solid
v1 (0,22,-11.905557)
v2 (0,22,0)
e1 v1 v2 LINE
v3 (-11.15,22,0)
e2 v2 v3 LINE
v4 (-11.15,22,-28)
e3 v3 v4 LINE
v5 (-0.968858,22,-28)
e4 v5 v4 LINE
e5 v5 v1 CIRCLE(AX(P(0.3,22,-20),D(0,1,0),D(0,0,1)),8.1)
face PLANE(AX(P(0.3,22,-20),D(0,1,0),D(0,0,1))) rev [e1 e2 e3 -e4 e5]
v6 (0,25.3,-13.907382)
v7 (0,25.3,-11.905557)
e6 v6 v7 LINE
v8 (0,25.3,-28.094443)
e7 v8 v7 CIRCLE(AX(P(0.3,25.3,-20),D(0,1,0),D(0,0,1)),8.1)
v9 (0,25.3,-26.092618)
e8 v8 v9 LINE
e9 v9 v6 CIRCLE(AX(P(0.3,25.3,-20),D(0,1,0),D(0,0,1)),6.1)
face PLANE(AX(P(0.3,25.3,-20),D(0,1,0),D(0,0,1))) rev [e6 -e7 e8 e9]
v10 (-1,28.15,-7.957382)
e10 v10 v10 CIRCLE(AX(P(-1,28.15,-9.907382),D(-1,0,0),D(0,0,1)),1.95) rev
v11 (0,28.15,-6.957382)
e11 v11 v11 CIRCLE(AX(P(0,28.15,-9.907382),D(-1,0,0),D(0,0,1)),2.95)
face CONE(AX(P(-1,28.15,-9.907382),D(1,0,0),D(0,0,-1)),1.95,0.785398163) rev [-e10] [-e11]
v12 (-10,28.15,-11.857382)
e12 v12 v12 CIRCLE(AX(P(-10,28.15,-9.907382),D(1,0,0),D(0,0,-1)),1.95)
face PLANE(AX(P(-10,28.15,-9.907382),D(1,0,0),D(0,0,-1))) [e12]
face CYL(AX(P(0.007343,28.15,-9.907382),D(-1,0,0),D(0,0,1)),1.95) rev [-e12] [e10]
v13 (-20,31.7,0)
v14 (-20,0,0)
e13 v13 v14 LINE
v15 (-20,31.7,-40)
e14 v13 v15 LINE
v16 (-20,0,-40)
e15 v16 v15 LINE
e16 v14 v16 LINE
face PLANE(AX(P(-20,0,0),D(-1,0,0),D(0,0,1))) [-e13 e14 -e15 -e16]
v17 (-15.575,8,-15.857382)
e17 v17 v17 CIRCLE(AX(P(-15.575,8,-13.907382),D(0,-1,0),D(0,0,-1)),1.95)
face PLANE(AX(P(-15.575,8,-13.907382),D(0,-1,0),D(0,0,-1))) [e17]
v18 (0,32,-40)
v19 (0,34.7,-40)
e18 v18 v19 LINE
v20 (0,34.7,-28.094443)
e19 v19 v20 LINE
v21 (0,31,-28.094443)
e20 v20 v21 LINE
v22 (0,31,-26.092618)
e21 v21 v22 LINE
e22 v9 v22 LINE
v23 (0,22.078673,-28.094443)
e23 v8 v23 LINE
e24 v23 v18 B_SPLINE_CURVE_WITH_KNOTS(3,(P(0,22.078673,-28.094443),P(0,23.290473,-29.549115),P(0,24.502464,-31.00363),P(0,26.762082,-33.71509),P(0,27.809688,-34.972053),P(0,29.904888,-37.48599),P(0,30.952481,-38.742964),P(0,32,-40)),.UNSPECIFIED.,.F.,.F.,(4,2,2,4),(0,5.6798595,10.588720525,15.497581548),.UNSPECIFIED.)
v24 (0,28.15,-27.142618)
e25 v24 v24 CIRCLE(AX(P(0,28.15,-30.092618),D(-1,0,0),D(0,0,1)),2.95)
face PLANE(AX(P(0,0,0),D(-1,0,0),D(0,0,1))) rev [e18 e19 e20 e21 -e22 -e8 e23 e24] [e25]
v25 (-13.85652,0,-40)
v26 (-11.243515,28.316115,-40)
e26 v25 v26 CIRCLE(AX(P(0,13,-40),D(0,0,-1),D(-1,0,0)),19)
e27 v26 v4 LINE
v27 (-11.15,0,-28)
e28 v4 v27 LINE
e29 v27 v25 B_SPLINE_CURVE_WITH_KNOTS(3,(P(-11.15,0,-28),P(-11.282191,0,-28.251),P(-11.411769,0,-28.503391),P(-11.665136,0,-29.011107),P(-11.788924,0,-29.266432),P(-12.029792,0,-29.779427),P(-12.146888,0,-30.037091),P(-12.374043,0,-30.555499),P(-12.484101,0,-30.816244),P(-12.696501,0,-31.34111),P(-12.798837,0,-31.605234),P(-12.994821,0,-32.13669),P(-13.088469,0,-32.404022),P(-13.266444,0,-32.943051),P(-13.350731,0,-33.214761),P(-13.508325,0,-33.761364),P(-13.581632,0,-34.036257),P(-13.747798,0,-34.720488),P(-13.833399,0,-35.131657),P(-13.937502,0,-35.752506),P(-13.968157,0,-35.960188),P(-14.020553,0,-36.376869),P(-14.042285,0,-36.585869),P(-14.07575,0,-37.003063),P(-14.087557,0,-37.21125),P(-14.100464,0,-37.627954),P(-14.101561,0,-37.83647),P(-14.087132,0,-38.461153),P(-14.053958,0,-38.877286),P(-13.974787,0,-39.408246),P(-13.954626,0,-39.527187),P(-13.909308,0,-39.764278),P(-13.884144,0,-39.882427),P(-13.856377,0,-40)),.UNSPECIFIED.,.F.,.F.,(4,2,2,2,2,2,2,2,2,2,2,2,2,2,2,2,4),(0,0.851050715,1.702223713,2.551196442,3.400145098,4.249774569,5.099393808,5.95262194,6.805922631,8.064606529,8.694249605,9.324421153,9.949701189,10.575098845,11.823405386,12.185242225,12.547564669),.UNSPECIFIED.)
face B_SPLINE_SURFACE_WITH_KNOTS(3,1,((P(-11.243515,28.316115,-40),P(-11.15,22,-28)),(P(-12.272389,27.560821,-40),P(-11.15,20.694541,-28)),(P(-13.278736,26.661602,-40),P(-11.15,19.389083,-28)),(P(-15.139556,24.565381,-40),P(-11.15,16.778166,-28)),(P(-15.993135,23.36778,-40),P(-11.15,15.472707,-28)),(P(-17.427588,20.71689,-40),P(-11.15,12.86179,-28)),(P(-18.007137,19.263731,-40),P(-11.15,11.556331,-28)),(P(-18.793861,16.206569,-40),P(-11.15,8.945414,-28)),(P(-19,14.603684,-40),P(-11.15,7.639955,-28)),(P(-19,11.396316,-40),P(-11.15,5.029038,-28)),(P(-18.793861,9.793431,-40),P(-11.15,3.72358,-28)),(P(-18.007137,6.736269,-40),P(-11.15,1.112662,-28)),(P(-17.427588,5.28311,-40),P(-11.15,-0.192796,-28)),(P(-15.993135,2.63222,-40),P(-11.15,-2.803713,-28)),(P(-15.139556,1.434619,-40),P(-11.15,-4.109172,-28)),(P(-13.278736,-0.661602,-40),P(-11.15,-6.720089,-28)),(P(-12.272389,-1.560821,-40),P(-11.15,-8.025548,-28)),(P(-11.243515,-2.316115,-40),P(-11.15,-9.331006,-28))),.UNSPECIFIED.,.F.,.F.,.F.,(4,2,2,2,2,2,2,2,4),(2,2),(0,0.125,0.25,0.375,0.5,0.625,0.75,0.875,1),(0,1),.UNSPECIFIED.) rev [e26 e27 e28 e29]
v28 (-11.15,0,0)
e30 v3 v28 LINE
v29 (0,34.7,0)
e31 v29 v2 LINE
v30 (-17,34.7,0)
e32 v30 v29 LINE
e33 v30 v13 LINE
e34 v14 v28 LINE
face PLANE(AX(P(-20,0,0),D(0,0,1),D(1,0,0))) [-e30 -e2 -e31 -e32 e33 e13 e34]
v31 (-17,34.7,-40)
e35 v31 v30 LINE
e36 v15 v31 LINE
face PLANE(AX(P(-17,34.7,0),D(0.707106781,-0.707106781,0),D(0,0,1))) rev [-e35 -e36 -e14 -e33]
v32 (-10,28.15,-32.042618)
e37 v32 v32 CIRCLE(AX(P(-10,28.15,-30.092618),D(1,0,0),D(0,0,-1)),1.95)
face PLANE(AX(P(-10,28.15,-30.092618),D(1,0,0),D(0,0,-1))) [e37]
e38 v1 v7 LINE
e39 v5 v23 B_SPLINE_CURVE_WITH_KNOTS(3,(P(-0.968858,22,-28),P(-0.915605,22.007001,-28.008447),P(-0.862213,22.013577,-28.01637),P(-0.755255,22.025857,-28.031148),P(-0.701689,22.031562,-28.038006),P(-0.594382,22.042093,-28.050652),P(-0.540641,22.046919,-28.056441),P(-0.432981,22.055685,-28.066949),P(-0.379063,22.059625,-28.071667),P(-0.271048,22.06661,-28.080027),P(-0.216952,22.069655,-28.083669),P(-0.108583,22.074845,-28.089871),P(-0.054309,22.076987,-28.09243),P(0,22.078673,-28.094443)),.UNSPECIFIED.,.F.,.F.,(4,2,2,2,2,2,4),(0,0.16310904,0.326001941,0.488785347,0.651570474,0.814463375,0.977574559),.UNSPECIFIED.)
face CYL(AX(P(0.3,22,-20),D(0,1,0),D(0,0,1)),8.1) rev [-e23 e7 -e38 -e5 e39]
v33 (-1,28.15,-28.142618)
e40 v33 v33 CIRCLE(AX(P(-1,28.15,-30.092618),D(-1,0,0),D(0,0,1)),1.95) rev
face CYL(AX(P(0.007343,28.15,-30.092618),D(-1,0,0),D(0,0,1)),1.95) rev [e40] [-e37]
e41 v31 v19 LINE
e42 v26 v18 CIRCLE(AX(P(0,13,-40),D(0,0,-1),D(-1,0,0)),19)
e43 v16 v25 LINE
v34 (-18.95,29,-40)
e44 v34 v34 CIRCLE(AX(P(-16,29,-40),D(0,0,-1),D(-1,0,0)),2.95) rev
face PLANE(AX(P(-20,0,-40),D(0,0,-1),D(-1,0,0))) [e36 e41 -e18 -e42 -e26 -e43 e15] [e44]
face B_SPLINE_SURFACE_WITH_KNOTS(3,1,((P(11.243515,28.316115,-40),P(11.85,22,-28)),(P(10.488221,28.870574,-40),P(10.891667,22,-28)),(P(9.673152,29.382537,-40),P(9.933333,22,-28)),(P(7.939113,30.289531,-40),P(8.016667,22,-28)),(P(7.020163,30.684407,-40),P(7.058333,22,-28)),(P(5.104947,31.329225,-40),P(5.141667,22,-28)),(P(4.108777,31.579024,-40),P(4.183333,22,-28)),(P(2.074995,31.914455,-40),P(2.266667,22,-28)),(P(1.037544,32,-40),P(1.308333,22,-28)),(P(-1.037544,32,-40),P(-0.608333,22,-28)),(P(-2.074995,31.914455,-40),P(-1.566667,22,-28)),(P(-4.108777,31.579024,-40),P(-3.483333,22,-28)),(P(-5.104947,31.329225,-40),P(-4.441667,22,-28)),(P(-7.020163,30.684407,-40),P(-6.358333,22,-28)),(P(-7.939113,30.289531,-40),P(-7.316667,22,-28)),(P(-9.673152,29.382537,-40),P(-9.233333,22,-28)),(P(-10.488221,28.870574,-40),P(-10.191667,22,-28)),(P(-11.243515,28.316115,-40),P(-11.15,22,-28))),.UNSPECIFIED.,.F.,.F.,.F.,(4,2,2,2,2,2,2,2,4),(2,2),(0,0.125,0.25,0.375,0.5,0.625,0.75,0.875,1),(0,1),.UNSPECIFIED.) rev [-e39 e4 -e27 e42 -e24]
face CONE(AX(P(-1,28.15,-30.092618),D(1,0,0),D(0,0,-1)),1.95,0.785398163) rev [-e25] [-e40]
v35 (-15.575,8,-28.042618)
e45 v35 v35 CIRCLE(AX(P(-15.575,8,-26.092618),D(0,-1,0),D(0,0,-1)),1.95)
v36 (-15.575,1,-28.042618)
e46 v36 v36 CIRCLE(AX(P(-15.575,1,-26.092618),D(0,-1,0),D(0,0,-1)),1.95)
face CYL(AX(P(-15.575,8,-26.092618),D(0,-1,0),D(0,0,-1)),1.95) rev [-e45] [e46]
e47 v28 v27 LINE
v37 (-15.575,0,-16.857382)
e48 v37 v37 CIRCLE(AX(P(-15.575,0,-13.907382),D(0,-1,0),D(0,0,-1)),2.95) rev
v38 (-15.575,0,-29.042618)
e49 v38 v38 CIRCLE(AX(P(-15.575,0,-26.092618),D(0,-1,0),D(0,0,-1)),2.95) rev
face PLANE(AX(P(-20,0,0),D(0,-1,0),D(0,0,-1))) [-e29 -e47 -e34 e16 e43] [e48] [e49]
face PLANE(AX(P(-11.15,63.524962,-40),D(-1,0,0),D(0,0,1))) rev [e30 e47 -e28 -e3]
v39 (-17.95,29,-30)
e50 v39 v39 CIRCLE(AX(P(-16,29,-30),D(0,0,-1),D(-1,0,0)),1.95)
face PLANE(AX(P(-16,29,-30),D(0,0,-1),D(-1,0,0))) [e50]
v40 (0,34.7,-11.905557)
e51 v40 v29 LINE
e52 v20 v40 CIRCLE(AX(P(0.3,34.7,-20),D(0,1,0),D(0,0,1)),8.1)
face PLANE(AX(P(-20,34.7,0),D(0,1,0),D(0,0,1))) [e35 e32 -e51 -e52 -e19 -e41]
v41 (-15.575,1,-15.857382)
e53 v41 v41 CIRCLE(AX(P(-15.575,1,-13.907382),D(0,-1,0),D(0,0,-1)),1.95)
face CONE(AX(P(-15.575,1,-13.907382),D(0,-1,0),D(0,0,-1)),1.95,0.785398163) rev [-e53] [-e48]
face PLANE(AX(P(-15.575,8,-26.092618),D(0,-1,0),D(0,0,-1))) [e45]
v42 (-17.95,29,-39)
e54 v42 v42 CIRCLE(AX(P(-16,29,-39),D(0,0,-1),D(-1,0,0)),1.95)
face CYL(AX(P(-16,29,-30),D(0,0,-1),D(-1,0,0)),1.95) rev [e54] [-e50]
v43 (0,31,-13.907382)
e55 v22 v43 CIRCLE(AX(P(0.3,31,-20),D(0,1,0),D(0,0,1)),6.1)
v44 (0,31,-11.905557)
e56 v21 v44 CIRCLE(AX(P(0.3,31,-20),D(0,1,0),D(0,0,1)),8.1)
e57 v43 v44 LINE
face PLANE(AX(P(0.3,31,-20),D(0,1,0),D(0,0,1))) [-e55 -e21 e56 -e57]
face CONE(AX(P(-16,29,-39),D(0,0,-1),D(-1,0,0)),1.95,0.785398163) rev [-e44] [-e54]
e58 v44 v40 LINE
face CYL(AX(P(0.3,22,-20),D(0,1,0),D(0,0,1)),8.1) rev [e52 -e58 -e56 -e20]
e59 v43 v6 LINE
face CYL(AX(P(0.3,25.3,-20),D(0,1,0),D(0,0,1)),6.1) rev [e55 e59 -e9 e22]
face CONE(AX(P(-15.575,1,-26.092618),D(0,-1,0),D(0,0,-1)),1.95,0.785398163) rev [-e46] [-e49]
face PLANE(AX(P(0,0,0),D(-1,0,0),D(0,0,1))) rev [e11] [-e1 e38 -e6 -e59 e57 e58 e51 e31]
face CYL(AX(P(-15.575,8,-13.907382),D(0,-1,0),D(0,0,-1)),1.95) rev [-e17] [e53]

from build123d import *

# Parameters (mm, degrees)
SKETCH1_W               = 40
SKETCH1_H               = 34.7
BOSS_EXTRUDE1_DEPTH     = 20
SKETCH2_R               = 8.1
CUT_EXTRUDE1_DEPTH      = 12.7
SKETCH5_W               = 11.15
SKETCH5_H               = 40
CUT_EXTRUDE5_DEPTH      = 22
SKETCH9_R               = 8.1
SKETCH9_R_2             = 6.1
BOSS_EXTRUDE2_DEPTH     = 5.7
CUT_EXTRUDE6_DEPTH      = 57.604681952
CUT_EXTRUDE6_DEPTH_BACK = 57.604681952
SKETCH10_W              = 12
SKETCH10_H              = 40
SKETCH11_R              = 1.95
CUT_EXTRUDE7_DEPTH      = 8
CHAMFER1_SIZE           = 1
SKETCH12_R              = 1.95
CUT_EXTRUDE8_DEPTH      = 54.889609545
CHAMFER2_SIZE           = 1
SKETCH15_R              = 1.95
CUT_EXTRUDE11_DEPTH     = 10
CHAMFER3_SIZE           = 1
CHAMFER7_SIZE           = 3


with BuildPart() as part:
    # Sketch1 → Boss-Extrude1 (new body)
    with BuildSketch(Plane(origin=(0, 0, 0), x_dir=(0, 0, -1), z_dir=(1, 0, 0))):
        with Locations((20, 17.35)):
            Rectangle(SKETCH1_W, SKETCH1_H)
    extrude(amount=-BOSS_EXTRUDE1_DEPTH)

    # Sketch2 → Cut-Extrude1 (cut)
    with BuildSketch(Plane(origin=(0, 34.7, 0), x_dir=(1, 0, 0), z_dir=(0, 1, 0))):
        with Locations((0.3, 20)):
            Circle(SKETCH2_R)
    extrude(amount=-CUT_EXTRUDE1_DEPTH, mode=Mode.SUBTRACT)

    # Sketch5 → Cut-Extrude5 (cut)
    with BuildSketch(Plane.XZ):
        with Locations((-5.575, -20)):
            Rectangle(SKETCH5_W, SKETCH5_H)
    extrude(amount=-CUT_EXTRUDE5_DEPTH, mode=Mode.SUBTRACT)

    # Cut-Loft1: read off the stored shape, not the designer's step
    # Cut-Loft1: loft between two sections, ruled curve by curve
    cut_loft1_from = [
        Edge.make_bspline([(11.243514961, 28.316114759, -40), (10.488221253, 28.870573657, -40), (9.673151561, 29.382537078, -40), (7.939112522, 30.28953078, -40), (7.020163395, 30.684407436, -40), (5.104947281, 31.329224581, -40), (4.108776624, 31.579024462, -40), (2.074994957, 31.914454558, -40), (1.037543565, 32, -40), (-1.037543565, 32, -40), (-2.074994957, 31.914454558, -40), (-4.108776624, 31.579024462, -40), (-5.104947281, 31.329224581, -40), (-7.020163395, 30.684407436, -40), (-7.939112522, 30.28953078, -40), (-9.673151561, 29.382537078, -40), (-10.488221253, 28.870573657, -40), (-11.243514961, 28.316114759, -40)], [0, 0, 0, 0, 0.125, 0.125, 0.25, 0.25, 0.375, 0.375, 0.5, 0.5, 0.625, 0.625, 0.75, 0.75, 0.875, 0.875, 1, 1, 1, 1], 3),
        Edge.make_bspline([(-11.243514961, 28.316114759, -40), (-12.272389396, 27.560821051, -40), (-13.278735727, 26.661602289, -40), (-15.139556406, 24.56538073, -40), (-15.993134823, 23.367779698, -40), (-17.42758787, 20.71689046, -40), (-18.007136515, 19.263731202, -40), (-18.79386095, 16.206568982, -40), (-19, 14.603683637, -40), (-19, 11.396316363, -40), (-18.79386095, 9.793431018, -40), (-18.007136515, 6.736268798, -40), (-17.42758787, 5.28310954, -40), (-15.993134823, 2.632220302, -40), (-15.139556406, 1.43461927, -40), (-13.278735727, -0.661602289, -40), (-12.272389396, -1.560821051, -40), (-11.243514961, -2.316114759, -40)], [0, 0, 0, 0, 0.125, 0.125, 0.25, 0.25, 0.375, 0.375, 0.5, 0.5, 0.625, 0.625, 0.75, 0.75, 0.875, 0.875, 1, 1, 1, 1], 3),
        Edge.make_line((-11.243514961, -2.316114759, -40), (11.243514961, 28.316114759, -40)),
    ]
    cut_loft1_to = [
        Edge.make_bspline([(11.85, 22, -28), (10.891666667, 22, -28), (9.933333333, 22, -28), (8.016666667, 22, -28), (7.058333333, 22, -28), (5.141666667, 22, -28), (4.183333333, 22, -28), (2.266666667, 22, -28), (1.308333333, 22, -28), (-0.608333333, 22, -28), (-1.566666667, 22, -28), (-3.483333333, 22, -28), (-4.441666667, 22, -28), (-6.358333333, 22, -28), (-7.316666667, 22, -28), (-9.233333333, 22, -28), (-10.191666667, 22, -28), (-11.15, 22, -28)], [0, 0, 0, 0, 0.125, 0.125, 0.25, 0.25, 0.375, 0.375, 0.5, 0.5, 0.625, 0.625, 0.75, 0.75, 0.875, 0.875, 1, 1, 1, 1], 3),
        Edge.make_bspline([(-11.15, 22, -28), (-11.15, 20.694541399, -28), (-11.15, 19.389082798, -28), (-11.15, 16.778165596, -28), (-11.15, 15.472706995, -28), (-11.15, 12.861789793, -28), (-11.15, 11.556331192, -28), (-11.15, 8.94541399, -28), (-11.15, 7.639955389, -28), (-11.15, 5.029038187, -28), (-11.15, 3.723579586, -28), (-11.15, 1.112662384, -28), (-11.15, -0.192796217, -28), (-11.15, -2.803713419, -28), (-11.15, -4.10917202, -28), (-11.15, -6.720089222, -28), (-11.15, -8.025547823, -28), (-11.15, -9.331006424, -28)], [0, 0, 0, 0, 0.125, 0.125, 0.25, 0.25, 0.375, 0.375, 0.5, 0.5, 0.625, 0.625, 0.75, 0.75, 0.875, 0.875, 1, 1, 1, 1], 3),
        Edge.make_line((-11.15, -9.331006424, -28), (11.85, 22, -28)),
    ]
    cut_loft1 = Solid(Shell([*[Face.make_surface_from_curves(cut_loft1_from[k], cut_loft1_to[k]) for k in range(3)], Face(Wire(cut_loft1_from)), Face(Wire(cut_loft1_to))]))
    add(cut_loft1, mode=Mode.SUBTRACT)

    # Sketch9 → Boss-Extrude2 (add)
    with BuildSketch(Plane(origin=(0, 31, 0), x_dir=(1, 0, 0), z_dir=(0, 1, 0))):
        with Locations((0.3, 20)):
            Circle(SKETCH9_R)
        with Locations(Location((0.3, 20, 0), (0, 0, 270))):
            Circle(SKETCH9_R_2, mode=Mode.SUBTRACT)
    extrude(amount=-BOSS_EXTRUDE2_DEPTH)

    # Sketch10 → Cut-Extrude6 (cut, two sides: drawn at the far end of the back side and taken through both)
    with BuildSketch(Plane(origin=(0, 0, 0), x_dir=(1, 0, 0), z_dir=(0, 1, 0)).offset(-CUT_EXTRUDE6_DEPTH_BACK)):
        with Locations((6, 20)):
            Rectangle(SKETCH10_W, SKETCH10_H)
    extrude(amount=CUT_EXTRUDE6_DEPTH + CUT_EXTRUDE6_DEPTH_BACK, mode=Mode.SUBTRACT)

    # Sketch11 → Cut-Extrude7 (cut)
    with BuildSketch(Plane.XZ):
        with Locations(Location((-15.575, -13.907381515, 0), (0, 0, 270))):
            Circle(SKETCH11_R)
        with Locations(Location((-15.575, -26.092618485, 0), (0, 0, 270))):
            Circle(SKETCH11_R)
    extrude(amount=-CUT_EXTRUDE7_DEPTH, mode=Mode.SUBTRACT)

    # Chamfer1
    chamfer1_edges = [part.edges().sort_by_distance(p)[0] for p in [
        (-15.575, 0, -11.957381515),
        (-15.575, 0, -24.142618485),
    ]]
    chamfer(chamfer1_edges, length=CHAMFER1_SIZE)

    # Sketch12 → Cut-Extrude8 (cut, through all)
    with BuildSketch(Plane(origin=(-10, 0, 0), x_dir=(0, 0, -1), z_dir=(1, 0, 0))):
        with Locations(Location((9.907381515, 28.15, 0), (0, 0, 180))):
            Circle(SKETCH12_R)
        with Locations(Location((30.092618485, 28.15, 0), (0, 0, 180))):
            Circle(SKETCH12_R)
    extrude(amount=CUT_EXTRUDE8_DEPTH, mode=Mode.SUBTRACT)

    # Chamfer2
    chamfer2_edges = [part.edges().sort_by_distance(p)[0] for p in [
        (0, 28.15, -11.857381515),
        (0, 28.15, -32.042618485),
    ]]
    chamfer(chamfer2_edges, length=CHAMFER2_SIZE)

    # Sketch15 → Cut-Extrude11 (cut)
    with BuildSketch(Plane(origin=(0, 0, -40), x_dir=(-1, 0, 0), z_dir=(0, 0, -1))):
        with Locations((16, 29)):
            Circle(SKETCH15_R)
    extrude(amount=-CUT_EXTRUDE11_DEPTH, mode=Mode.SUBTRACT)

    # Chamfer3
    chamfer3_edges = [part.edges().sort_by_distance(p)[0] for p in [
        (-14.05, 29, -40),
    ]]
    chamfer(chamfer3_edges, length=CHAMFER3_SIZE)

    # Chamfer7
    chamfer7_edges = [part.edges().sort_by_distance(p)[0] for p in [
        (-20, 34.7, -20),
    ]]
    chamfer(chamfer7_edges, length=CHAMFER7_SIZE)


solid = part.part
